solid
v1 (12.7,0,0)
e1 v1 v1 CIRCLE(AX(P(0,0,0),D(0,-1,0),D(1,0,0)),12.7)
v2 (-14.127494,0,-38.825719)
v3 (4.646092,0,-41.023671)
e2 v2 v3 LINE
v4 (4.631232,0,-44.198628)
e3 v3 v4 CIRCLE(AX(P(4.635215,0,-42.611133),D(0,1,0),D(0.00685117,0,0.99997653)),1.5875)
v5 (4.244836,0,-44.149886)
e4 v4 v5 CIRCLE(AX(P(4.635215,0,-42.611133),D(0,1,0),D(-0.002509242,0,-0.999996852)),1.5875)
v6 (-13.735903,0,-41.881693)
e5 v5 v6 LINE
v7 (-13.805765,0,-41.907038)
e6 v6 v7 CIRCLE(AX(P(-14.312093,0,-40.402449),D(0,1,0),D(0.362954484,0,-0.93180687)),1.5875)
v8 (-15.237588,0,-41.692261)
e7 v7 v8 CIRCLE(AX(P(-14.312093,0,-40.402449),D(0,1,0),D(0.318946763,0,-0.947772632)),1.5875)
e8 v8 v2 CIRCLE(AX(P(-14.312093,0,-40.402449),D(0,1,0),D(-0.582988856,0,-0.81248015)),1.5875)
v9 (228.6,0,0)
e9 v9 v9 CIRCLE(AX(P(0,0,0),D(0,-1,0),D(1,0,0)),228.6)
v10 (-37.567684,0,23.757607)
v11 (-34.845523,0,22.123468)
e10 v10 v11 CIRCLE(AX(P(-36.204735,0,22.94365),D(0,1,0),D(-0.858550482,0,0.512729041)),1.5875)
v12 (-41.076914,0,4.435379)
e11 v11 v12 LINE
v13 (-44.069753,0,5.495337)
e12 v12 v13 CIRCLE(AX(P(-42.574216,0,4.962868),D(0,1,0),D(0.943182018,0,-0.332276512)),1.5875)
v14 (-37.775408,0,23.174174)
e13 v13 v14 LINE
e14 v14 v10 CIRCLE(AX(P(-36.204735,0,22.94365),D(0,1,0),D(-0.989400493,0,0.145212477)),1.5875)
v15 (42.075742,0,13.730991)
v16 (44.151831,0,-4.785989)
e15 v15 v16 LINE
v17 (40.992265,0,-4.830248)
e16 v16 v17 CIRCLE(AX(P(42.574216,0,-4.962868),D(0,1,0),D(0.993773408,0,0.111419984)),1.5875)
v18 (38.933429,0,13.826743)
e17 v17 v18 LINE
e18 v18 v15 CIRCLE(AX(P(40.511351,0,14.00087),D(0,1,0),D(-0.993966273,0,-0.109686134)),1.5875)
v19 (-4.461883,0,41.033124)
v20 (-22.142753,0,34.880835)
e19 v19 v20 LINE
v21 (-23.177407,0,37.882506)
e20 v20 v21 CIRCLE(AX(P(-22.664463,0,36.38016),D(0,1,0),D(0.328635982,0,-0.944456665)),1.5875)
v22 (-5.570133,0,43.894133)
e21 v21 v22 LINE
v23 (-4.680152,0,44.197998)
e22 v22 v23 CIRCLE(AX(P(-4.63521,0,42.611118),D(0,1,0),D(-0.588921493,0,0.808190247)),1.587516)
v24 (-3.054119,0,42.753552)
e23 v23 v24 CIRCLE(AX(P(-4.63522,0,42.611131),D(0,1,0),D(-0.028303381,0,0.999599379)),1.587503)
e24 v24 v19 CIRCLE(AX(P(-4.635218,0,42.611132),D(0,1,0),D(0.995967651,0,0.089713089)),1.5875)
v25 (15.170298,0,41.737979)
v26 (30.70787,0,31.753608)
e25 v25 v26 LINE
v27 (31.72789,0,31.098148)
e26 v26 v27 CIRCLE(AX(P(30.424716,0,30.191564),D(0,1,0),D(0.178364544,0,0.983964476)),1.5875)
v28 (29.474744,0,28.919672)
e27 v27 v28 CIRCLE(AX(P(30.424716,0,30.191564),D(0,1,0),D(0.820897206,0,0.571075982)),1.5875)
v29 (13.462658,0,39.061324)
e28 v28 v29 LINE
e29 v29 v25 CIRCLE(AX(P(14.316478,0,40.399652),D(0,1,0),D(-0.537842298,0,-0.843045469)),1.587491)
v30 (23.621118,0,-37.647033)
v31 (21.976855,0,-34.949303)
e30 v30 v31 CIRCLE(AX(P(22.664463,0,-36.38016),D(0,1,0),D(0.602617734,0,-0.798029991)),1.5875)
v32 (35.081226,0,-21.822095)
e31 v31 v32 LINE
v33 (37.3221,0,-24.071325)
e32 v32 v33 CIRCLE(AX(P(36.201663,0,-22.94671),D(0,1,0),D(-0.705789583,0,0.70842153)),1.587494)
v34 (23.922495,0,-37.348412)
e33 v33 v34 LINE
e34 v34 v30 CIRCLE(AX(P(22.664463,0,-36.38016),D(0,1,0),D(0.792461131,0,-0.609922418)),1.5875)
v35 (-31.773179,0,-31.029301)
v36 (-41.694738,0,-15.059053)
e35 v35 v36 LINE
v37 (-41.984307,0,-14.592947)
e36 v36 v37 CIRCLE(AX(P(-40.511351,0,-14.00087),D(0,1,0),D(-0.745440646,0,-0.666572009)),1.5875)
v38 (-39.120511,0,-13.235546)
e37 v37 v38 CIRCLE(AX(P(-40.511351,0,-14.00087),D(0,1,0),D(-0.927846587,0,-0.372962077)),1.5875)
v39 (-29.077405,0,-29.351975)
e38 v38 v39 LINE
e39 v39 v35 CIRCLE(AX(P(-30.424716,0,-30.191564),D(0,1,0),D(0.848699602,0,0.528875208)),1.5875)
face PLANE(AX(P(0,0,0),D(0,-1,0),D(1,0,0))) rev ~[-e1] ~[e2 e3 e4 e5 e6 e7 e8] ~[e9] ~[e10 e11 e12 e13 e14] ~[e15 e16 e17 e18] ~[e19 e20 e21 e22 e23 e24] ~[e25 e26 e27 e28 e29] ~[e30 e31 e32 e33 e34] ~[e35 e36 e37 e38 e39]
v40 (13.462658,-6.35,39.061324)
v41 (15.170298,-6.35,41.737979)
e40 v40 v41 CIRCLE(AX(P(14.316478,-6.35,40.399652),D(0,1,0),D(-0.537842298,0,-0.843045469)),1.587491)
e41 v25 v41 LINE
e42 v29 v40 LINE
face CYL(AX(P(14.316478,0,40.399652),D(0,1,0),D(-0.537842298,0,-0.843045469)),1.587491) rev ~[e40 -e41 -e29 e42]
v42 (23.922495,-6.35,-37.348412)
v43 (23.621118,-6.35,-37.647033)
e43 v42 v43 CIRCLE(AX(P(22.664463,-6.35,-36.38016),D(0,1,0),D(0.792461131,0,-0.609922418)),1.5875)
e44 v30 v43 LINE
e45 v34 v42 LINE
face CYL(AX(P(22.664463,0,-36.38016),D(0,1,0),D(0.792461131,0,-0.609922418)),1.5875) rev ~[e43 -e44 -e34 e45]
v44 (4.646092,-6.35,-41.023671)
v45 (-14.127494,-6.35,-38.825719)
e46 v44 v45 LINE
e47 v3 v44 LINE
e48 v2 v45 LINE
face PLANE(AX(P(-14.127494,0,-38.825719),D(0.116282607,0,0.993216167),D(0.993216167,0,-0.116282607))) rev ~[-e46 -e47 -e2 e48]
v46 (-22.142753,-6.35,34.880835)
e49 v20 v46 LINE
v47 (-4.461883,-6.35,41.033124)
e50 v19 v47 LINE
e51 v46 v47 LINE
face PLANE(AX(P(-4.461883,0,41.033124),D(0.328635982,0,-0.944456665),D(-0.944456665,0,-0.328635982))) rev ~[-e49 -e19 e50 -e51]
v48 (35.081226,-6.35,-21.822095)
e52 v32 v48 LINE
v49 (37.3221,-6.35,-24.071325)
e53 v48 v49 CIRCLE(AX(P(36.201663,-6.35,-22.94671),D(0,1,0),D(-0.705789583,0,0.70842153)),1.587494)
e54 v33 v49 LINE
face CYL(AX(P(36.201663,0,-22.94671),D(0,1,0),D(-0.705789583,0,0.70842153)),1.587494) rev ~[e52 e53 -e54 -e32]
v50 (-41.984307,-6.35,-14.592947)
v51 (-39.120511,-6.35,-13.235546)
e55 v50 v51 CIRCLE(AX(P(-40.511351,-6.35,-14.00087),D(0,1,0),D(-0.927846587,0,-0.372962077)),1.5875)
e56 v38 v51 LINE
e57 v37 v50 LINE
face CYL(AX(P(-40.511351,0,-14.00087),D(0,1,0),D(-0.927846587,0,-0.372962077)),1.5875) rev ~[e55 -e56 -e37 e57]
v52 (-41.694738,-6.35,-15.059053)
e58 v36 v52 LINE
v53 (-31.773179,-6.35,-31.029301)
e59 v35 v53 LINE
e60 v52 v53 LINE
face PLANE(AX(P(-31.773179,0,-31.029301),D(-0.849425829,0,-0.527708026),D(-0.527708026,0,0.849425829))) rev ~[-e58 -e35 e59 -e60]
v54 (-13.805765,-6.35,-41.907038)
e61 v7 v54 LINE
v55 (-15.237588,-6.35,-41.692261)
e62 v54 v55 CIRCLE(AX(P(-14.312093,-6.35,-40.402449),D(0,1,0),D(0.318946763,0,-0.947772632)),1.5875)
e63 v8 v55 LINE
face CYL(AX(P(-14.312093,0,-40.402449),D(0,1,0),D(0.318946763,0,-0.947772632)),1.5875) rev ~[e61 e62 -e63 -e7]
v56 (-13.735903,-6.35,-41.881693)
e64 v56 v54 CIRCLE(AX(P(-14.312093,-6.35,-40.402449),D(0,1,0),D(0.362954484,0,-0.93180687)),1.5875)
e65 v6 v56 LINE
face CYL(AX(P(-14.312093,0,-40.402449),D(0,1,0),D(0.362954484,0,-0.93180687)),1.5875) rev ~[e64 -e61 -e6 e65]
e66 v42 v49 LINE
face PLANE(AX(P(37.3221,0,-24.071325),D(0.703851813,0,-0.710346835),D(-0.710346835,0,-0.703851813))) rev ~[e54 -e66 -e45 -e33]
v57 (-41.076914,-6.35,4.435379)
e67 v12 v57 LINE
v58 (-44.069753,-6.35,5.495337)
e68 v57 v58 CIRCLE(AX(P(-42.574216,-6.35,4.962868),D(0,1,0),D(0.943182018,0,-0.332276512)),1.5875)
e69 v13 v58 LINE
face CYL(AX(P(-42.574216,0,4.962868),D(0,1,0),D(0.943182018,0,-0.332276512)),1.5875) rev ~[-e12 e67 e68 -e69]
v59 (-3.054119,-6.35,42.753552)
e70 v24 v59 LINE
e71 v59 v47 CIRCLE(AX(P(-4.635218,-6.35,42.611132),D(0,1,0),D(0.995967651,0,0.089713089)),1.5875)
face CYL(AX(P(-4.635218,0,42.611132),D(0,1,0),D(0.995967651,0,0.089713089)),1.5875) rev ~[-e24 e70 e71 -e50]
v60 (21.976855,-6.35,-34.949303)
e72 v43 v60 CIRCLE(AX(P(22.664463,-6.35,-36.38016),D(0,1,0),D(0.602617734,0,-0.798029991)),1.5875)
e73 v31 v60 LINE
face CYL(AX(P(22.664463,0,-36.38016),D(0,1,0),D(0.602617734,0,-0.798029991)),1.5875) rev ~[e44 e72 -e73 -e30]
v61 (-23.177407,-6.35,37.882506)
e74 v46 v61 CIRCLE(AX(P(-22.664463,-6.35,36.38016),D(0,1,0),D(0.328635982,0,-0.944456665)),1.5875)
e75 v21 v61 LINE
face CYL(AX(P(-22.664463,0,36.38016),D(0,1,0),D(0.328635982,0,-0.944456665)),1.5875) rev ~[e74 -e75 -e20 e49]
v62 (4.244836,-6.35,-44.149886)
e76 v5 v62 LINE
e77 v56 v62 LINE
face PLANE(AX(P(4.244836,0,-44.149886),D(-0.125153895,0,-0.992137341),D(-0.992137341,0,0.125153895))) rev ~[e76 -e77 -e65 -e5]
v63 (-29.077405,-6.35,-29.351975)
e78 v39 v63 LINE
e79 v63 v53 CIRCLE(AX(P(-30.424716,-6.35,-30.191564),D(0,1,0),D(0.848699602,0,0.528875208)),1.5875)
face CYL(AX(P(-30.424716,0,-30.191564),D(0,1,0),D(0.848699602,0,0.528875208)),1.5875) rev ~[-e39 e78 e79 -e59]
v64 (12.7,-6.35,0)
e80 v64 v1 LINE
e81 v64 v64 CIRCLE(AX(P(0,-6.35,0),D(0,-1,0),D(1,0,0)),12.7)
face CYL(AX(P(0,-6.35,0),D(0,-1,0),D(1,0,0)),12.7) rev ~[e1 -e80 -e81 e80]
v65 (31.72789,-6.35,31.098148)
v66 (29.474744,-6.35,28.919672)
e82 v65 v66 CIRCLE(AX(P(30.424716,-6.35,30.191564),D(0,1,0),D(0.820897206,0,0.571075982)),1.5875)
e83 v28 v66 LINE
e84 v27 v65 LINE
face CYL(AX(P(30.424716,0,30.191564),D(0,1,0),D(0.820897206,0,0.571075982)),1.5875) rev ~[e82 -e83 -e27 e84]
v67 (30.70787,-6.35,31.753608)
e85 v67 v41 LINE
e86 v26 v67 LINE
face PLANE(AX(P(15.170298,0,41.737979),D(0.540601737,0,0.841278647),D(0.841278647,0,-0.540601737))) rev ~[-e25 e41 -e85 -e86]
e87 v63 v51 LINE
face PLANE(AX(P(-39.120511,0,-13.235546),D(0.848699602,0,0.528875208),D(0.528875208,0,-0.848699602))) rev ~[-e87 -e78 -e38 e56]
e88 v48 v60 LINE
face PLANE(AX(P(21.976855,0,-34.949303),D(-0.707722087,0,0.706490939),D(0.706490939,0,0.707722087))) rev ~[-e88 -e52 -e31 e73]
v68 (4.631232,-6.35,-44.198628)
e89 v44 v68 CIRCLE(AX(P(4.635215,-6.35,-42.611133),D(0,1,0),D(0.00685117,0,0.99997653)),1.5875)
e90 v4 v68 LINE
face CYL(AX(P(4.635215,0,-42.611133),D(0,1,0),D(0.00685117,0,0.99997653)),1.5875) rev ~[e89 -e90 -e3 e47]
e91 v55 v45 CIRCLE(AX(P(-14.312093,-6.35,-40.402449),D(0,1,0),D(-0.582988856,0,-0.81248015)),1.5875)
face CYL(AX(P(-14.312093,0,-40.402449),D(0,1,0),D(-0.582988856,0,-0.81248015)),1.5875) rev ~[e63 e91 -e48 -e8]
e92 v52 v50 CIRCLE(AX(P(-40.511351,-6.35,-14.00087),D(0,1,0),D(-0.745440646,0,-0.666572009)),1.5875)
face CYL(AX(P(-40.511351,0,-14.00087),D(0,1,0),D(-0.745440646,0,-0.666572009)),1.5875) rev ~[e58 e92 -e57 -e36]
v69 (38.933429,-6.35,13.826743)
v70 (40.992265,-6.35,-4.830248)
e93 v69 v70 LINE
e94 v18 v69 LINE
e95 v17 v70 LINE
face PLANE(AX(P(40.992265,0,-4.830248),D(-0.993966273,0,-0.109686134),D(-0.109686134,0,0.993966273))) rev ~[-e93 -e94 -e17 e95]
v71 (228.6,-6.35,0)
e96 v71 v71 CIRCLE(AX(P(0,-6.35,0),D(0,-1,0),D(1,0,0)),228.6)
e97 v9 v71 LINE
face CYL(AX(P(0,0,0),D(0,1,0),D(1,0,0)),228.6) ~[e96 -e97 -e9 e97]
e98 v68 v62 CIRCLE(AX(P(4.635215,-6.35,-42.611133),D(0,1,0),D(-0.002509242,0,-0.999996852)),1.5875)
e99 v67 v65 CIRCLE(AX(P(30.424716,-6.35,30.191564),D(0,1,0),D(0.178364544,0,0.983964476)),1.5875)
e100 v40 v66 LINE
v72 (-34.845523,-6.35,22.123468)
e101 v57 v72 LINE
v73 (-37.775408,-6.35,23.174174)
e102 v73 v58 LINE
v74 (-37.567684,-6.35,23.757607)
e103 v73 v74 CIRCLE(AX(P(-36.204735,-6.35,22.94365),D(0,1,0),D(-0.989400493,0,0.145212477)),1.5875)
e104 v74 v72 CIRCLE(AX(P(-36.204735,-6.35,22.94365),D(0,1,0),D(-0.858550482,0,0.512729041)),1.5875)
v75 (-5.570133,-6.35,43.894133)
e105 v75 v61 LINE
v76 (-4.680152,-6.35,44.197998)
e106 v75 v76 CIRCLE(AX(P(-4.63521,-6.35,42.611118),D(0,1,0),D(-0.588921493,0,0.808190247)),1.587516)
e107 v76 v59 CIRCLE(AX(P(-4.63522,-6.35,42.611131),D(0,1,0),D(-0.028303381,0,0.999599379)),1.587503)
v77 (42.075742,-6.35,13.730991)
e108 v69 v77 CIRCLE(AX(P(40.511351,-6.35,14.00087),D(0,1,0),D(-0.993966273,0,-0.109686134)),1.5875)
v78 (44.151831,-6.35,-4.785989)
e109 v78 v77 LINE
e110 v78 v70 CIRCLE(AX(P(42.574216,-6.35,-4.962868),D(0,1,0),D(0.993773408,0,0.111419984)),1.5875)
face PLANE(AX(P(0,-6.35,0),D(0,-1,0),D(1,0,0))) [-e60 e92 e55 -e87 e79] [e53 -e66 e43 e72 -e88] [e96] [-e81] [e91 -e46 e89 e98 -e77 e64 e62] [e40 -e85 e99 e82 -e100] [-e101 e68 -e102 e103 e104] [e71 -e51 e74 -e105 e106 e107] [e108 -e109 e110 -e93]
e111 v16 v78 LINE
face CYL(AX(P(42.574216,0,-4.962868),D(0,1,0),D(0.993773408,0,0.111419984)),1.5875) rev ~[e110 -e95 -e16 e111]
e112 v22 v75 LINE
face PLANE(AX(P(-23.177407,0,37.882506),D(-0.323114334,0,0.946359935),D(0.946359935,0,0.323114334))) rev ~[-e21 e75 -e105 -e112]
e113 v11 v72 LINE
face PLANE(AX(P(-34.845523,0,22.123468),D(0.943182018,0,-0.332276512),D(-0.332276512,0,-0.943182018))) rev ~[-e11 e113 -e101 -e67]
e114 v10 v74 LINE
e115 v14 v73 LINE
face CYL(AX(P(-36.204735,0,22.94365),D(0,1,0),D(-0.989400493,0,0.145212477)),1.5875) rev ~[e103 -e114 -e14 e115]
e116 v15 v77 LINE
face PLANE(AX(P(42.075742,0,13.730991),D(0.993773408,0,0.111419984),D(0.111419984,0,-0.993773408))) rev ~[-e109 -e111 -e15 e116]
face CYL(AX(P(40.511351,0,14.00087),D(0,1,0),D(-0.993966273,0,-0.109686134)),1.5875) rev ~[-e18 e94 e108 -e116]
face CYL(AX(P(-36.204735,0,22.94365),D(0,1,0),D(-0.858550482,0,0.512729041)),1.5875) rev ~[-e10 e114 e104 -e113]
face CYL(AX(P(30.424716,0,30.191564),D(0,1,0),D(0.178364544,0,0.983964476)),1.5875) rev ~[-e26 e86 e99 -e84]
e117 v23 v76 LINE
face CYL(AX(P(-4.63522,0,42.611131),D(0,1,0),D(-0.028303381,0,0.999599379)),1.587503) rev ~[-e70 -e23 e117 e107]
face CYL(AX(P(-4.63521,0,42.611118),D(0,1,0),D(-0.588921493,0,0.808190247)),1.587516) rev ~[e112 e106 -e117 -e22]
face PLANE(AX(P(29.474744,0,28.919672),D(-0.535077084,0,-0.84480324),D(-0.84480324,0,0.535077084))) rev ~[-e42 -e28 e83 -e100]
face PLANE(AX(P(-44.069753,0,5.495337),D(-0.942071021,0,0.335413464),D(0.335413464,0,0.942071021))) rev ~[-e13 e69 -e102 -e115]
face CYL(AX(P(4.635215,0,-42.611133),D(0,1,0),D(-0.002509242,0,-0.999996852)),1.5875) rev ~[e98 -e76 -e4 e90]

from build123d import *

# Parameters (mm, degrees)
F0_R     = 228.6
F1_DEPTH = 6.35
F3_DEPTH = 6.351
F4_R     = 12.7
F5_DEPTH = 6.351


# Not quite as in the source:
# - ends of sketch curves that miss each other by under 0.0002 mm in the source are joined


with BuildPart() as f1:
    # F0 (on Front) → F1 (new body)
    with BuildSketch(Plane.XZ):
        Circle(F0_R)
    extrude(amount=F1_DEPTH)

    # F2 (on face) → F3 (cut, through all)
    with BuildSketch(Plane(origin=(0, 0, 0), x_dir=(-1, 0, 0), z_dir=(0, 1, 0))):
        with BuildLine():
            Line((4.4618826202, 41.03312384), (22.1427530806, 34.8808349771))
            ThreePointArc((22.1427530806, 34.8808349771), (24.1653047772, 35.8628309135), (23.1774067066, 37.8825063297))
            Line((23.1774067066, 37.8825063297), (5.5701325615, 43.8941330325))
            Line((5.5701325615, 43.8941330325), (4.6801519701, 44.1979978468))
            ThreePointArc((4.6801519701, 44.1979978468), (3.5809145294, 43.7979774539), (3.0541190675, 42.7535519863))
            ThreePointArc((3.0541190675, 42.7535519863), (3.4066096848, 41.6058073542), (4.4618826202, 41.03312384))
        make_face()
        with BuildLine():
            Line((4.6801519701, 44.1979978468), (5.5701325615, 43.8941330325))
            ThreePointArc((5.5701325615, 43.8941330325), (5.1481595065, 44.1134796096), (4.6801519701, 44.1979978468))
        make_face()
        with BuildLine():
            Line((-31.727890274, 31.0981475896), (-30.7078696735, 31.753608073))
            ThreePointArc((-30.7078696735, 31.753608073), (-31.2829212175, 31.5270943199), (-31.727890274, 31.0981475896))
        make_face()
        with BuildLine():
            Line((-15.1702982711, 41.737979033), (-30.7078696735, 31.753608073))
            Line((-30.7078696735, 31.753608073), (-31.727890274, 31.0981475896))
            ThreePointArc((-31.727890274, 31.0981475896), (-31.5281772375, 29.050280341), (-29.4747442403, 28.9196721839))
            Line((-29.4747442403, 28.9196721839), (-13.4626581421, 39.061324038))
            ThreePointArc((-13.4626581421, 39.061324038), (-12.9781507091, 41.2534716), (-15.1702982711, 41.737979033))
        make_face()
        with BuildLine():
            Line((-40.992265014, -4.8302478058), (-38.9334293172, 13.8267433983))
            ThreePointArc((-38.9334293172, 13.8267433983), (-40.5597026781, 15.5876336173), (-42.0757424664, 13.7309907417))
            Line((-42.0757424664, 13.7309907417), (-44.151831017, -4.7859890094))
            ThreePointArc((-44.151831017, -4.7859890094), (-42.5964510469, -6.5502125075), (-40.992265014, -4.8302478058))
        make_face()
        with BuildLine():
            Line((34.8455227588, 22.1234679996), (41.0769142774, 4.4353792716))
            ThreePointArc((41.0769142774, 4.4353792716), (43.1041953835, 3.4664465633), (44.0697534768, 5.4953371086))
            Line((44.0697534768, 5.4953371086), (37.7754084063, 23.174174494))
            Line((37.7754084063, 23.174174494), (37.5676840132, 23.7576070393))
            ThreePointArc((37.5676840132, 23.7576070393), (35.3876634671, 24.3047338716), (34.8455227588, 22.1234679996))
        make_face()
        with BuildLine():
            Line((37.5676840132, 23.7576070393), (37.7754084063, 23.174174494))
            ThreePointArc((37.7754084063, 23.174174494), (37.7002728684, 23.4761185604), (37.5676840132, 23.7576070393))
        make_face()
        with BuildLine():
            Line((-23.6211183536, -37.6470325436), (-23.9224947466, -37.3484117712))
            ThreePointArc((-23.9224947466, -37.3484117712), (-23.7818274542, -37.5078355326), (-23.6211183536, -37.6470325436))
        make_face()
        with BuildLine():
            Line((-37.3220998756, -24.0713252866), (-23.9224947466, -37.3484117712))
            Line((-23.9224947466, -37.3484117712), (-23.6211183536, -37.6470325436))
            ThreePointArc((-23.6211183536, -37.6470325436), (-21.3089064889, -37.2063703199), (-21.9768545063, -34.9493031191))
            Line((-21.9768545063, -34.9493031191), (-35.0812263092, -21.8220953205))
            ThreePointArc((-35.0812263092, -21.8220953205), (-37.3262780755, -21.8262735204), (-37.3220998756, -24.0713252866))
        make_face()
        with BuildLine():
            Line((14.1274943747, -38.8257185152), (-4.6460917137, -41.0236705883))
            ThreePointArc((-4.6460917137, -41.0236705883), (-6.2226980939, -42.6185631758), (-4.6312320578, -44.1986283327))
            Line((-4.6312320578, -44.1986283327), (-4.2448360729, -44.1498861266))
            Line((-4.2448360729, -44.1498861266), (13.7359027682, -41.8816925861))
            Line((13.7359027682, -41.8816925861), (15.2375878216, -41.6922614193))
            ThreePointArc((15.2375878216, -41.6922614193), (15.7924641961, -39.8291626809), (14.1274943747, -38.8257185152))
        make_face()
        with BuildLine():
            Line((-4.2448360729, -44.1498861266), (-4.6312320578, -44.1986283327))
            ThreePointArc((-4.6312320578, -44.1986283327), (-4.4365336717, -44.1861513585), (-4.2448360729, -44.1498861266))
        make_face()
        with BuildLine():
            ThreePointArc((13.8057650277, -41.9070382349), (14.5475871245, -41.9723850949), (15.2375878216, -41.6922614193))
            Line((15.2375878216, -41.6922614193), (13.8057650277, -41.9070382349))
        make_face()
        with BuildLine():
            Line((13.8057650277, -41.9070382349), (15.2375878216, -41.6922614193))
            Line((15.2375878216, -41.6922614193), (13.7359027682, -41.8816925861))
            ThreePointArc((13.7359027682, -41.8816925861), (13.7706855601, -41.8947742862), (13.8057650277, -41.9070382349))
        make_face()
        with BuildLine():
            Line((39.1205111726, -13.2355457292), (29.0774053416, -29.3519750753))
            ThreePointArc((29.0774053416, -29.3519750753), (29.5860528198, -31.5394518473), (31.7731794636, -31.0293009591))
            Line((31.7731794636, -31.0293009591), (41.6947378015, -15.0590532006))
            Line((41.6947378015, -15.0590532006), (41.9843072327, -14.5929474337))
            ThreePointArc((41.9843072327, -14.5929474337), (41.1912924211, -12.5663543268), (39.1205111726, -13.2355457292))
        make_face()
        with BuildLine():
            Line((41.9843072327, -14.5929474337), (41.6947378015, -15.0590532006))
            ThreePointArc((41.6947378015, -15.0590532006), (41.8598142795, -14.8386066278), (41.9843072327, -14.5929474337))
        make_face()
    extrude(amount=-F3_DEPTH, mode=Mode.SUBTRACT)

    # F4 (on face) → F5 (cut, through all)
    with BuildSketch(Plane.XZ.offset(6.35)):
        Circle(F4_R)
    extrude(amount=-F5_DEPTH, mode=Mode.SUBTRACT)


solid = f1.part
